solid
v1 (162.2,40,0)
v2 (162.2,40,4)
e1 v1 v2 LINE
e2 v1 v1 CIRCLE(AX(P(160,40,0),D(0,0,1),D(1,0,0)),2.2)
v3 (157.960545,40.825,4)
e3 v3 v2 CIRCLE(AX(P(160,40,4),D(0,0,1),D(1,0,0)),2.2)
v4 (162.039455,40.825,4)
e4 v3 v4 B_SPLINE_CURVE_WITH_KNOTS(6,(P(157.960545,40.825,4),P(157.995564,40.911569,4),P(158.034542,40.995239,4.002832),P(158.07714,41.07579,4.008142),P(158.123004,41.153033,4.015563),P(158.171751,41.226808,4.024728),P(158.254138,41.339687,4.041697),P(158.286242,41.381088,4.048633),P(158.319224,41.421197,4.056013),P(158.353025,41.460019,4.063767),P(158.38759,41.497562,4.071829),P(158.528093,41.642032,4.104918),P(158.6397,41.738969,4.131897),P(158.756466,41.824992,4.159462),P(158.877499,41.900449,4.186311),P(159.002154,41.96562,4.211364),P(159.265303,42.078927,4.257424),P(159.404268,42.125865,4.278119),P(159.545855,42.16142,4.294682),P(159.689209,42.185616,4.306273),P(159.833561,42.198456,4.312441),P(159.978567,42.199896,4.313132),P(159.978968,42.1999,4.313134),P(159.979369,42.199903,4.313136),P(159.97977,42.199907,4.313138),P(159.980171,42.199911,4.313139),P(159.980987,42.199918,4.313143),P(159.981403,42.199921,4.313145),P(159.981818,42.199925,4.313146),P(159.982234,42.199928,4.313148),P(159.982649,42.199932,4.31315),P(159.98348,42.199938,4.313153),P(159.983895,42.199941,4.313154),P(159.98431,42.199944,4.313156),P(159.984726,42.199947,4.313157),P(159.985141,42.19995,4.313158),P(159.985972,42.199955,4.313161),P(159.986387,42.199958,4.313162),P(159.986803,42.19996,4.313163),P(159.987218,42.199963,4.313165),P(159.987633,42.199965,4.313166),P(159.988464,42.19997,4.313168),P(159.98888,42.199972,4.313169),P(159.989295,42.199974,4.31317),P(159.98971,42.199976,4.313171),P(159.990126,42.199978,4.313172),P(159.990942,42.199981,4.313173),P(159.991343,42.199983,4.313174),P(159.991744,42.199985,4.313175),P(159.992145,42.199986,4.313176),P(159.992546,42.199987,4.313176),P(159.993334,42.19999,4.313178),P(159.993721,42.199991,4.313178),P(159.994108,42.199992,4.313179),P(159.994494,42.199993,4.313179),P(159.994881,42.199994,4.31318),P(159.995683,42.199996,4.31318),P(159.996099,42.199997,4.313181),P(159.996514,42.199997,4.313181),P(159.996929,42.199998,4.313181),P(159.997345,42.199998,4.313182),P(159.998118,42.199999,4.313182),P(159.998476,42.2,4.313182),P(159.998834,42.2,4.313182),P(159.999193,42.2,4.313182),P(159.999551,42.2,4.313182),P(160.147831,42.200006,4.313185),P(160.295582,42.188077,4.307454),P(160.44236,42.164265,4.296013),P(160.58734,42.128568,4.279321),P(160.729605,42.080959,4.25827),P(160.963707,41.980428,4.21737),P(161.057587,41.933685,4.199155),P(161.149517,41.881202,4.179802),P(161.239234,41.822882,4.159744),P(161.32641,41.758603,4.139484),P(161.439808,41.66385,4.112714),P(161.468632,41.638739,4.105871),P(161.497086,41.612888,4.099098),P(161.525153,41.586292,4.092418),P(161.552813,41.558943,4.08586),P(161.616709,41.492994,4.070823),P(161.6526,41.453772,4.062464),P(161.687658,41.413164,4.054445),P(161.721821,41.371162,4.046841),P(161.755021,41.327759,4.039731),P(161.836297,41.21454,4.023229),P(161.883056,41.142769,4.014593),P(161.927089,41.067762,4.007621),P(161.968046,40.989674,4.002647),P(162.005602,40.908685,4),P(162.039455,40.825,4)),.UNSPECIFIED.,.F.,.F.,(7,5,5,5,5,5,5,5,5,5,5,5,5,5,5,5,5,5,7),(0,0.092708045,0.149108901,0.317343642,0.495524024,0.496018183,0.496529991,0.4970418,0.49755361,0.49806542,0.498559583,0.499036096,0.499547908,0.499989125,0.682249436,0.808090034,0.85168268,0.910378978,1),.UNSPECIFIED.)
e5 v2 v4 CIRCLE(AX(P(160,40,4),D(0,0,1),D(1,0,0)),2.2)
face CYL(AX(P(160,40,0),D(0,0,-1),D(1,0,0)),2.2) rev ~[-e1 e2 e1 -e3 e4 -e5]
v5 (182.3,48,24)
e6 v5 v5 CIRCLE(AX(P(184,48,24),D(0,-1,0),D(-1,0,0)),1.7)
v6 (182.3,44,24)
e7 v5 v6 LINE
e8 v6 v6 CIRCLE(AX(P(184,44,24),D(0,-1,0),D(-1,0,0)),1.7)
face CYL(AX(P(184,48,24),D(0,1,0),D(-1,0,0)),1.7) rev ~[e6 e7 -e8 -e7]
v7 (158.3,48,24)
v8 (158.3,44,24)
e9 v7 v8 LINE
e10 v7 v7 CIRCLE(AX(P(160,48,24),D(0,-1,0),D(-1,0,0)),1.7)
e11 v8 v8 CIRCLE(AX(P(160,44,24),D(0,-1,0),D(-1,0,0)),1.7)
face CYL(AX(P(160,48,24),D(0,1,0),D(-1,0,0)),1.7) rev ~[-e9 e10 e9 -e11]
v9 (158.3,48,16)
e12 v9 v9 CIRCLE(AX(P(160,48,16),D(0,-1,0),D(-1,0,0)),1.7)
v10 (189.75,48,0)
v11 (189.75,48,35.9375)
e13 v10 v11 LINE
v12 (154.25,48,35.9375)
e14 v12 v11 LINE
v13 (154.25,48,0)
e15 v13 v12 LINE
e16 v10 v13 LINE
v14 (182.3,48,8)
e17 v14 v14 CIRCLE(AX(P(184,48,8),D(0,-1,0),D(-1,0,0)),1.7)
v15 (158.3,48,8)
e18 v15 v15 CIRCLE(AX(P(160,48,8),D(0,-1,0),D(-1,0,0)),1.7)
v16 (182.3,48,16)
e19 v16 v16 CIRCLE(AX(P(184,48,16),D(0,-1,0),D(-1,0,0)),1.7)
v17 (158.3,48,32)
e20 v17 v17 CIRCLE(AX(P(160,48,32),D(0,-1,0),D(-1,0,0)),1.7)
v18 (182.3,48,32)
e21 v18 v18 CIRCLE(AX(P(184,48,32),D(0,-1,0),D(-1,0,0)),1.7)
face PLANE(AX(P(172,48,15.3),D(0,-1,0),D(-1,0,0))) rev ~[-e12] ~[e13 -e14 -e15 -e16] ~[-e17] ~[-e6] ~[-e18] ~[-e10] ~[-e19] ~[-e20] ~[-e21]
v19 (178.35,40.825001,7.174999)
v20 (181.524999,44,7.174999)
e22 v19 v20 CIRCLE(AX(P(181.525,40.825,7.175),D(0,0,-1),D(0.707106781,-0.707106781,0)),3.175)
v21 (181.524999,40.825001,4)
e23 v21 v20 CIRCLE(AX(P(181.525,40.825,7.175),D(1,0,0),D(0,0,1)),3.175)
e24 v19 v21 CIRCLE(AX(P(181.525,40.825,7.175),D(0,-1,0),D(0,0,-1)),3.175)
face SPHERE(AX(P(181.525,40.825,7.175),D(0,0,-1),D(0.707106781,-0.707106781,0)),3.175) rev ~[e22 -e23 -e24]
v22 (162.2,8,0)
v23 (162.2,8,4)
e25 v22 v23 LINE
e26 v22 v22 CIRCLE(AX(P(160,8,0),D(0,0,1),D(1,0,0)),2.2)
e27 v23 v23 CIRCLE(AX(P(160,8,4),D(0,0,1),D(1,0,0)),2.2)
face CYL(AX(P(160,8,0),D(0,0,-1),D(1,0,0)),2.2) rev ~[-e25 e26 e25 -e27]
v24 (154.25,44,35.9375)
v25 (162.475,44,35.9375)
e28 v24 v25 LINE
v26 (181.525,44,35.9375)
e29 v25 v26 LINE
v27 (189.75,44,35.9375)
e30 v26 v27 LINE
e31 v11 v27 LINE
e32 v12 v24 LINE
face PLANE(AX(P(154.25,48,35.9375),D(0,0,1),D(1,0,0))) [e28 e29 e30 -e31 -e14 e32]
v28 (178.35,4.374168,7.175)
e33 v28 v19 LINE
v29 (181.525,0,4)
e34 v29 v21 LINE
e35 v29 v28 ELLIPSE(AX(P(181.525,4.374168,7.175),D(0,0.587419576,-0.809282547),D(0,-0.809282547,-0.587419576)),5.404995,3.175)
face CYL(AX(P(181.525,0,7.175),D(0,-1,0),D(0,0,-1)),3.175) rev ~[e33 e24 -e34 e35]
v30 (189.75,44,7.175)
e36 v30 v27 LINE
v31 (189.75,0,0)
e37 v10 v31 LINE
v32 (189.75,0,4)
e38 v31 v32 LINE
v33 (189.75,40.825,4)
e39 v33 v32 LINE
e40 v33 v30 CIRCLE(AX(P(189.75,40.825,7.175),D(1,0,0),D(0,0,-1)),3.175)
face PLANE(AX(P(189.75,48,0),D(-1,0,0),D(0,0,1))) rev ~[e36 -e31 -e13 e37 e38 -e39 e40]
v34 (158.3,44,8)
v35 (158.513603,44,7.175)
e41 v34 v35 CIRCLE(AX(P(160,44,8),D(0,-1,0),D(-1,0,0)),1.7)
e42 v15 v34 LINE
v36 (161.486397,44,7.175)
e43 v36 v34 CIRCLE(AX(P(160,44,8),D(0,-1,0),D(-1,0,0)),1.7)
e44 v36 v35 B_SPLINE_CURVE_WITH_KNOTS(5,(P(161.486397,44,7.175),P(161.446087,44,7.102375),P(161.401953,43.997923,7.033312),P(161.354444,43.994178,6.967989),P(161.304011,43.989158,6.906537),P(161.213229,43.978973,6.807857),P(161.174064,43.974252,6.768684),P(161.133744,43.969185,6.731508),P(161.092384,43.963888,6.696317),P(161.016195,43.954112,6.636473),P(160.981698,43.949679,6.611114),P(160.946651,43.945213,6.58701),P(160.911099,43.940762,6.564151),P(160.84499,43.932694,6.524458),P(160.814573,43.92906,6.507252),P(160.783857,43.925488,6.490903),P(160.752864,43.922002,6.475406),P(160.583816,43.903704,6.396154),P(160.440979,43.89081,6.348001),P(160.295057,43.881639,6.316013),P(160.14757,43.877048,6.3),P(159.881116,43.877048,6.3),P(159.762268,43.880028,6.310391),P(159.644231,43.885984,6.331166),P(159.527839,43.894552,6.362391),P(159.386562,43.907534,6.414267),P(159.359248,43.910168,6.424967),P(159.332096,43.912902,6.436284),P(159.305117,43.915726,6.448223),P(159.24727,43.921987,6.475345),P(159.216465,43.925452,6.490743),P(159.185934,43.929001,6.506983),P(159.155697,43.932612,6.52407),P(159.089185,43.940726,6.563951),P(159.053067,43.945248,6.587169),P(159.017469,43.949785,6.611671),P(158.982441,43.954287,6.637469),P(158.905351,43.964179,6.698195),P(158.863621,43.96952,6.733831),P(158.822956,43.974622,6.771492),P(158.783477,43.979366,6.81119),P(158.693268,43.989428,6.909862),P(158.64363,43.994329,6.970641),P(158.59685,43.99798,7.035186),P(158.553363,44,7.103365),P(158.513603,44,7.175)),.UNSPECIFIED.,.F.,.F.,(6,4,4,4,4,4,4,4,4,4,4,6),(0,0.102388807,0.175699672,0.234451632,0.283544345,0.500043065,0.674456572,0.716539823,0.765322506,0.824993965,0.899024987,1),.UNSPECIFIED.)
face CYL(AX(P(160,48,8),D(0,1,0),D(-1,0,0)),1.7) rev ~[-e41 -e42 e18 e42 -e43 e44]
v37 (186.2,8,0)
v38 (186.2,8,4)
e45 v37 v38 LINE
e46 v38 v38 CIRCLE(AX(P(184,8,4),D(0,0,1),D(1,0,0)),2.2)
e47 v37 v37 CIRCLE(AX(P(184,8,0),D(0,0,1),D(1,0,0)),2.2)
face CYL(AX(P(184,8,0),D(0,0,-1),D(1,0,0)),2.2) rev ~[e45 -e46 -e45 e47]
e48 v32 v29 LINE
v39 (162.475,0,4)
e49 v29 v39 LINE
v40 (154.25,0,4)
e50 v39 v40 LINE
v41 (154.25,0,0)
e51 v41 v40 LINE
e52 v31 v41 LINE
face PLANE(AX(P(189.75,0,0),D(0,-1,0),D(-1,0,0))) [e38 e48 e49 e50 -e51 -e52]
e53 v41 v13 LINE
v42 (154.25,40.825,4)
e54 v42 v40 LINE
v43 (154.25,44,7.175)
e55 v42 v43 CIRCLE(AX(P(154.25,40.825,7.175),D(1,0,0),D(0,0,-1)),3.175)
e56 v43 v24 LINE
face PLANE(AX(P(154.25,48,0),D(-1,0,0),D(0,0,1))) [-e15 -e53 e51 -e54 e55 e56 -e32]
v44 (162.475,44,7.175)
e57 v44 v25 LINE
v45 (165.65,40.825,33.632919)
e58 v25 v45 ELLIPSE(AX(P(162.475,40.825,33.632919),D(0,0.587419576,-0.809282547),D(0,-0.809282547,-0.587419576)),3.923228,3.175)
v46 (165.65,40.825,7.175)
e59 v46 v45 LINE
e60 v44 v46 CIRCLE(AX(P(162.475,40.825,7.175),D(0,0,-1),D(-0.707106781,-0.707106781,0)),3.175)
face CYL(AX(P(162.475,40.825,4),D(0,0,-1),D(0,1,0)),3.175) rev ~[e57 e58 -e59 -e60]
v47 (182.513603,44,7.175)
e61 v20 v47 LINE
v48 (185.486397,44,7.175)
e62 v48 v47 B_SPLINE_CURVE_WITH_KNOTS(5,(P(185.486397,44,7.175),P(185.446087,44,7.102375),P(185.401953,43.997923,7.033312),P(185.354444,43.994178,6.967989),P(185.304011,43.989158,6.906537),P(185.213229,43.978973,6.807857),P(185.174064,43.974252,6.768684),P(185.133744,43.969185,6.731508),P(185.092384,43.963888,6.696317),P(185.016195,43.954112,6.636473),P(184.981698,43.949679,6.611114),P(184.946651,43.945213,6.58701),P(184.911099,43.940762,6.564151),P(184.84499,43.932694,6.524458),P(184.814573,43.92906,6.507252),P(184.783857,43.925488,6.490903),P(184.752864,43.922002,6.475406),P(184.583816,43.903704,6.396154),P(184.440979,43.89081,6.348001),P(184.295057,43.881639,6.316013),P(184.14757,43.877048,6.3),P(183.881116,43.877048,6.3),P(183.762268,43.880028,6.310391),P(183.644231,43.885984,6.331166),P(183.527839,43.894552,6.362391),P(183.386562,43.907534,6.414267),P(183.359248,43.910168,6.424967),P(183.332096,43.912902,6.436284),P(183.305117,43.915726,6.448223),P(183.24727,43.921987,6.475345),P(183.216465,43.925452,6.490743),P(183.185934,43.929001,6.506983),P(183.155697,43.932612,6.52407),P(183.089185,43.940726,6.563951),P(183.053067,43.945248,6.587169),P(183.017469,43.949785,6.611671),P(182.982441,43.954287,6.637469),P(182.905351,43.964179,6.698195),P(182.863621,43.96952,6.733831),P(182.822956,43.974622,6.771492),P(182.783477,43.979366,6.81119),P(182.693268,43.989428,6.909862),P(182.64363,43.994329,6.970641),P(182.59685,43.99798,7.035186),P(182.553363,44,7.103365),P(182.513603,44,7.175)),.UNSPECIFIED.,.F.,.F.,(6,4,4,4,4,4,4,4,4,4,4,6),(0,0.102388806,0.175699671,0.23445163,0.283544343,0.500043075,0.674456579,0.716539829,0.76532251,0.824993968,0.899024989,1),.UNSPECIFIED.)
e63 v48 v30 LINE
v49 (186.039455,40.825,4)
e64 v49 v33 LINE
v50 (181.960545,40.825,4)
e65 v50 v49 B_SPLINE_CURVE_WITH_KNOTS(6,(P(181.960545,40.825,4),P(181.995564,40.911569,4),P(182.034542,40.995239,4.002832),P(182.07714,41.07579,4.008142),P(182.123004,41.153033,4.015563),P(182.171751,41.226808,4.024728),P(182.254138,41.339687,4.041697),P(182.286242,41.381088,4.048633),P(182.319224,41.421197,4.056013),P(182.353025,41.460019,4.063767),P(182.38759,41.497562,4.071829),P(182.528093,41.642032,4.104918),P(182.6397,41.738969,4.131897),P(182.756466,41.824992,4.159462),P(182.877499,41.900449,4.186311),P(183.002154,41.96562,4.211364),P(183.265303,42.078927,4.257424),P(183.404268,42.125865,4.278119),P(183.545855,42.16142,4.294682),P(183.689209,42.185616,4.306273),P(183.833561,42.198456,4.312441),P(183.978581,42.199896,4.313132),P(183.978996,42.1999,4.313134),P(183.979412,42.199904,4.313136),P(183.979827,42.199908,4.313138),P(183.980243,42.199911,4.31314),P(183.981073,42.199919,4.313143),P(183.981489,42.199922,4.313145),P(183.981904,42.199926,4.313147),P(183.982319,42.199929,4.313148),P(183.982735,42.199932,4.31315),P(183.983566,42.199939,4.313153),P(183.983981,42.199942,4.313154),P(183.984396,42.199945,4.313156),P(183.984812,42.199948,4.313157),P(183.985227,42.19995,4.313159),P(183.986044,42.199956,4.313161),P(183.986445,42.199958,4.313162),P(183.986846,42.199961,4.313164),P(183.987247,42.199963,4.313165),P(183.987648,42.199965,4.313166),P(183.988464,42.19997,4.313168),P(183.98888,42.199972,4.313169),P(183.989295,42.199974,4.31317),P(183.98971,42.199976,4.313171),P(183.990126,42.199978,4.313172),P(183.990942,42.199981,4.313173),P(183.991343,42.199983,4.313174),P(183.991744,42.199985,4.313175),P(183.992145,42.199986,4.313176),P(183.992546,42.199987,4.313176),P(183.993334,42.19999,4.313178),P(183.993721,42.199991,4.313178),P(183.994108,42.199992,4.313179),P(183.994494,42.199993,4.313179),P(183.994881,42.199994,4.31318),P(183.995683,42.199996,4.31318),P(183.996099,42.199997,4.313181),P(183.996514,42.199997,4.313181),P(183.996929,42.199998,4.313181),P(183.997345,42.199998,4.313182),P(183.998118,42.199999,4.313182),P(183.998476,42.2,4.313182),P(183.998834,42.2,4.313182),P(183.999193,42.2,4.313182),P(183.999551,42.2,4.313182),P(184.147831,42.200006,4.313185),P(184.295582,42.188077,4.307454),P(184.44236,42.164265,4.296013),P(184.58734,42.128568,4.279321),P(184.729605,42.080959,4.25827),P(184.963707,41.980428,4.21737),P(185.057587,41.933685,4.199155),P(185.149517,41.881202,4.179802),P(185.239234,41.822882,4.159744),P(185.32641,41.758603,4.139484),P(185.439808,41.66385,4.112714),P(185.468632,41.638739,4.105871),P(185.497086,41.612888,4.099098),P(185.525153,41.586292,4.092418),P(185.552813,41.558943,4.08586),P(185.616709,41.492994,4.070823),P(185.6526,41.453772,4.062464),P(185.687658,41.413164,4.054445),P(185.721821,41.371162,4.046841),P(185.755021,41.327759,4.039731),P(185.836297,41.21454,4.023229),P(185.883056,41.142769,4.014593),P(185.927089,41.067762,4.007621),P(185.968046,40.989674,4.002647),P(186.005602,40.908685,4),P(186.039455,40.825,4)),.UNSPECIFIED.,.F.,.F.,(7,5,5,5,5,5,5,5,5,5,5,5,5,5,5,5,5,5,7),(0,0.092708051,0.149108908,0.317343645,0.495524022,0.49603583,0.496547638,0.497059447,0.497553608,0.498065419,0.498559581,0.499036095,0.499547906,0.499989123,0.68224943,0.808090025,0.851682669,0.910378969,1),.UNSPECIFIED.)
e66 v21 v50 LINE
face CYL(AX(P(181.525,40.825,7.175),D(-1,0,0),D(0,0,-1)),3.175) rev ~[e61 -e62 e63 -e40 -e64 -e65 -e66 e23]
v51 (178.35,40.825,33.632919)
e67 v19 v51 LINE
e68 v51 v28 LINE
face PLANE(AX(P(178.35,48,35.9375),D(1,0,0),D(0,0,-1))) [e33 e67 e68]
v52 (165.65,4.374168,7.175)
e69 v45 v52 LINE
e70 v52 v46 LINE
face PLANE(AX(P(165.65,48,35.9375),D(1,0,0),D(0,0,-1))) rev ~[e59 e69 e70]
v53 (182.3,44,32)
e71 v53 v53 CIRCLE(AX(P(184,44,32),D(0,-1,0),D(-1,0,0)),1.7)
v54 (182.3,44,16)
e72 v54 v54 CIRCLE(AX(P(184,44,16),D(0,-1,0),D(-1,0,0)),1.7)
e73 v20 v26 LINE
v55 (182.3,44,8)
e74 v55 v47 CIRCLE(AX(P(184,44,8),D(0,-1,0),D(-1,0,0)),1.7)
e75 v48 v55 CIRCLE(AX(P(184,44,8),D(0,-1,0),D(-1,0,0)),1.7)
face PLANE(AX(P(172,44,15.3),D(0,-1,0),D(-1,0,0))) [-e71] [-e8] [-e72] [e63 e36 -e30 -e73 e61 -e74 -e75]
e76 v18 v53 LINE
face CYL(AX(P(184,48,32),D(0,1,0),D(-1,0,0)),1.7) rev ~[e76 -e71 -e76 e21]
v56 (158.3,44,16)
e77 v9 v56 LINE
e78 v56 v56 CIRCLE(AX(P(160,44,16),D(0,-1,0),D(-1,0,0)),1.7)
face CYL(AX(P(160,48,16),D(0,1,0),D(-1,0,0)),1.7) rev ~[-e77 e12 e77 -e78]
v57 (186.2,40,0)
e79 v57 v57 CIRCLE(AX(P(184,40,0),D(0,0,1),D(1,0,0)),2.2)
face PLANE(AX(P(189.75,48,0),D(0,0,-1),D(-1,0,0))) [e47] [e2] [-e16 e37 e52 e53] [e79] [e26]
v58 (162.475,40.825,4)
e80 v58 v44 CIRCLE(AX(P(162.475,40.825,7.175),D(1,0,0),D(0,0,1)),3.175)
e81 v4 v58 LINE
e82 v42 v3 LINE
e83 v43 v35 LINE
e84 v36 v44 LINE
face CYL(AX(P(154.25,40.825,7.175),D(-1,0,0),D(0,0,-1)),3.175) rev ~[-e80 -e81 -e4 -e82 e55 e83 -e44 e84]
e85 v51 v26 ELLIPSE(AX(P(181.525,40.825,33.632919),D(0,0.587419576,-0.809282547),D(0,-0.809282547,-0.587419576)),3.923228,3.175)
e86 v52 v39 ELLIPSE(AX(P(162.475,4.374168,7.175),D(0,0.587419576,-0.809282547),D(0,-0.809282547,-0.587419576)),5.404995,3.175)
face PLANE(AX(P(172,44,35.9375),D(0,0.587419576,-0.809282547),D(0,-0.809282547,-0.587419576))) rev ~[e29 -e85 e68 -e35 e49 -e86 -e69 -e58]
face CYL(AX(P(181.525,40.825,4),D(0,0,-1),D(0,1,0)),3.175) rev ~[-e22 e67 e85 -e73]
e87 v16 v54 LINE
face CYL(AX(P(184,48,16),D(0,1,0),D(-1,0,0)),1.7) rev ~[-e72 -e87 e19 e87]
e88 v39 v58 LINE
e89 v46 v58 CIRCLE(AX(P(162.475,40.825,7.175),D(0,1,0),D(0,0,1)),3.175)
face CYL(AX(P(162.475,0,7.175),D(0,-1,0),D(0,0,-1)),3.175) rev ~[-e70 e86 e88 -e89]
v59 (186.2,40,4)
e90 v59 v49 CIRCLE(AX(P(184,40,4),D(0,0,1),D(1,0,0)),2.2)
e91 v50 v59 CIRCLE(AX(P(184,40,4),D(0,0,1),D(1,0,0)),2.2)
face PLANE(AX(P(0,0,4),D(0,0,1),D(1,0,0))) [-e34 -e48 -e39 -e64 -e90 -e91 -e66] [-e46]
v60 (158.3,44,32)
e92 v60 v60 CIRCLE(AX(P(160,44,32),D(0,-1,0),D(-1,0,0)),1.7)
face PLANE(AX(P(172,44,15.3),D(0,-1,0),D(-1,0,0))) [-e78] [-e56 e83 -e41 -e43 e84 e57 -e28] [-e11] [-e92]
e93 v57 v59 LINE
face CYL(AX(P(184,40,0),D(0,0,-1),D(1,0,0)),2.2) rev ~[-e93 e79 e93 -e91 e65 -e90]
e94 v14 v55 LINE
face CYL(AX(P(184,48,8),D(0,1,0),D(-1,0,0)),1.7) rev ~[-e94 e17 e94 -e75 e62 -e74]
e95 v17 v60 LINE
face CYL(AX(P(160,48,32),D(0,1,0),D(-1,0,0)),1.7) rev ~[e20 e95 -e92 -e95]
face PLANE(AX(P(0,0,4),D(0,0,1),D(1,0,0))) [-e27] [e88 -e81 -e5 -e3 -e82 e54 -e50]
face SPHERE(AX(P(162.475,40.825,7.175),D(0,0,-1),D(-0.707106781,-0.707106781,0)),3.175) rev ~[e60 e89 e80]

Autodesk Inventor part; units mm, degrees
ref_plane "Work Plane1" through (172, 48, 15.3) normal (0, -1, 0) x (-1, 0, 0)
sketch "Sketch1" plane through (172, 48, 15.3) normal (0, -1, 0) x (-1, 0, 0)
  circle A0 centre (12, -16.7) radius 1.7 construction
  circle A1 centre (12, -32.7) radius 1.7 construction
  circle A2 centre (-12, 7.3) radius 1.7 construction
  circle A3 centre (-12, 15.3) radius 1.7 construction
  circle A4 centre (-12, 23.3) radius 1.7 construction
  circle A5 centre (-12, -24.7) radius 1.7 construction
  circle A6 centre (12, 23.3) radius 1.7 construction
  circle A7 centre (12, -56.7) radius 1.7 construction
  circle A8 centre (12, -48.7) radius 1.7 construction
  circle A9 centre (12, -40.7) radius 1.7 construction
  circle A10 centre (12, -8.7) radius 1.7 construction
  circle A11 centre (-12, -16.7) radius 1.7 construction
  circle A12 centre (12, -24.7) radius 1.7 construction
  circle A13 centre (-12, -0.7) radius 1.7 construction
  circle A14 centre (-12, -40.7) radius 1.7 construction
  circle A15 centre (-12, -48.7) radius 1.7 construction
  circle A16 centre (-12, -56.7) radius 1.7 construction
  circle A17 centre (-12, -32.7) radius 1.7 construction
  circle A18 centre (12, -80.7) radius 1.7 construction
  circle A19 centre (12, 15.3) radius 1.7 construction
  circle A20 centre (12, 7.3) radius 1.7 construction
  circle A21 centre (12, -0.7) radius 1.7 construction
  circle A22 centre (-12, -8.7) radius 1.7 construction
  circle A23 centre (-12, -80.7) radius 1.7 construction
  line L0 (10.05, 51.5627) -> (14.45, 51.5627) construction
  line L1 (14.45, 51.5627) -> (14.45, 45.5871) construction
  line L2 (14.45, 45.5871) -> (10.05, 45.5871) construction
  line L3 (10.05, 45.5871) -> (10.05, 51.5627) construction
  line L4 (10.05, -66.0122) -> (14.45, -66.0122) construction
  line L5 (14.45, -66.0122) -> (14.45, -71.9878) construction
  line L6 (14.45, -71.9878) -> (10.05, -71.9878) construction
  line L7 (10.05, -71.9878) -> (10.05, -66.0122) construction
  line L8 (-10.05, 75.3622) -> (-14.45, 75.3622) construction
  line L9 (-14.45, 75.3622) -> (-14.45, 81.3378) construction
  line L10 (-14.45, 81.3378) -> (-10.05, 81.3378) construction
  line L11 (-10.05, 81.3378) -> (-10.05, 75.3622) construction
  line L12 (-14.45, 56.302) -> (-10.05, 56.302) construction
  line L13 (-10.05, 56.302) -> (-10.05, 50.3264) construction
  line L14 (-10.05, 50.3264) -> (-14.45, 50.3264) construction
  line L15 (-14.45, 50.3264) -> (-14.45, 56.302) construction
  line L16 (9.5604, 33.925) -> (12.375, 35.55) construction
  line L17 (12.375, 35.55) -> (15.1896, 33.925) construction
  line L18 (15.1896, 33.925) -> (15.1896, 30.675) construction
  line L19 (15.1896, 30.675) -> (12.375, 29.05) construction
  line L20 (12.375, 29.05) -> (9.5604, 30.675) construction
  line L21 (9.5604, 30.675) -> (9.5604, 33.925) construction
  line L22 (2.8106, 33.925) -> (5.6252, 35.55) construction
  line L23 (5.6252, 35.55) -> (8.4398, 33.925) construction
  line L24 (8.4398, 33.925) -> (8.4398, 30.675) construction
  line L25 (8.4398, 30.675) -> (5.6252, 29.05) construction
  line L26 (5.6252, 29.05) -> (2.8106, 30.675) construction
  line L27 (2.8106, 30.675) -> (2.8106, 33.925) construction
  line L28 (3.2502, 68.3) -> (3.2502, 81) construction
  line L29 (3.2502, 81) -> (8.0002, 81) construction
  line L30 (8.0002, 81) -> (8.0002, 68.3) construction
  line L31 (8.0002, 68.3) -> (3.2502, 68.3) construction
  circle A24 centre (12.375, 40.3) radius 1.7 construction
  circle A25 centre (5.6252, 40.3) radius 1.7 construction
  line L32 (10.0002, 81) -> (14.75, 81) construction
  line L33 (14.75, 81) -> (14.75, 68.3) construction
  line L34 (14.75, 68.3) -> (10.0002, 68.3) construction
  line L35 (10.0002, 68.3) -> (10.0002, 81) construction
  line L36 (3.2502, 53.6) -> (3.2502, 66.3) construction
  line L37 (3.2502, 66.3) -> (8.0002, 66.3) construction
  line L38 (8.0002, 66.3) -> (8.0002, 53.6) construction
  line L39 (8.0002, 53.6) -> (3.2502, 53.6) construction
  circle A26 centre (-7.75, 60) radius 1.7 construction
  circle A27 centre (-7.75, -75) radius 1.7 construction
  line L40 (-6.125, 72.8146) -> (-4.5, 70) construction
  line L41 (-4.5, 70) -> (-6.125, 67.1854) construction
  line L42 (-6.125, 67.1854) -> (-9.375, 67.1854) construction
  line L43 (-9.375, 67.1854) -> (-11, 70) construction
  line L44 (-11, 70) -> (-9.375, 72.8146) construction
  line L45 (-9.375, 72.8146) -> (-6.125, 72.8146) construction
  line L46 (-6.125, -62.1854) -> (-4.5, -65) construction
  line L47 (-4.5, -65) -> (-6.125, -67.8146) construction
  line L48 (-6.125, -67.8146) -> (-9.375, -67.8146) construction
  line L49 (-9.375, -67.8146) -> (-11, -65) construction
  line L50 (-11, -65) -> (-9.375, -62.1854) construction
  line L51 (-9.375, -62.1854) -> (-6.125, -62.1854) construction
  line L52 (17.75, 85) -> (-17.75, 85) construction
  line L53 (-17.75, 85) -> (-17.75, -85) construction
  line L54 (-17.75, -85) -> (17.75, -85) construction
  line L55 (17.75, -85) -> (17.75, 85) construction
  line L56 (172, 15.3) -> (-20, 15.3) construction
  line L57 (-17.75, 15.3) -> (17.75, 15.3)
  line L58 (17.75, 15.3) -> (17.75, -20.6375)
  line L59 (17.75, -20.6375) -> (-17.75, -20.6375)
  line L60 (-17.75, 15.3) -> (-17.75, -20.6375)
  circle A28 centre (-12, 7.3) radius 1.7
  circle A29 centre (-12, -0.7) radius 1.7
  circle A30 centre (-12, -8.7) radius 1.7
  circle A31 centre (-12, -16.7) radius 1.7
  circle A32 centre (12, -16.7) radius 1.7
  circle A33 centre (12, -8.7) radius 1.7
  circle A34 centre (12, -0.7) radius 1.7
  circle A35 centre (12, 7.3) radius 1.7
extrude "Extrusion1" add sketch "Sketch1" along normal blind 4
ref_plane "Work Plane2" through (0, 0, 0) normal (0, 0, 1) x (1, 0, 0)
sketch "Sketch2" plane through (0, 0, 0) normal (0, 0, 1) x (1, 0, 0)
  line L0 (192, 0) -> (192, 48) construction
  line L1 (0, 48) -> (192, 48) construction
  line L2 (0, 0) -> (0, 48) construction
  line L3 (0, 0) -> (192, 0) construction
  circle A0 centre (168, 24) radius 7 construction
  circle A1 centre (144, 24) radius 7 construction
  arc A2 (160.9289, 33.8995) -> (158.1005, 31.0711) centre (159.5147, 32.4853) ccw construction
  line L4 (161.4142, 33.4142) -> (160.9289, 33.8995) construction
  arc A3 (158.5858, 30.5858) -> (161.4142, 33.4142) centre (160, 32) ccw construction
  line L5 (158.1005, 31.0711) -> (158.5858, 30.5858) construction
  line L6 (156.6863, 26) -> (155.3137, 26) construction
  arc A4 (156.6863, 22) -> (156.6863, 26) centre (156.6863, 24) ccw construction
  line L7 (155.3137, 22) -> (156.6863, 22) construction
  arc A5 (155.3137, 26) -> (155.3137, 22) centre (155.3137, 24) ccw construction
  arc A6 (158.1005, 16.9289) -> (160.9289, 14.1005) centre (159.5147, 15.5147) ccw construction
  line L8 (158.5858, 17.4142) -> (158.1005, 16.9289) construction
  arc A7 (161.4142, 14.5858) -> (158.5858, 17.4142) centre (160, 16) ccw construction
  line L9 (160.9289, 14.1005) -> (161.4142, 14.5858) construction
  arc A8 (177.8995, 31.0711) -> (175.0711, 33.8995) centre (176.4853, 32.4853) ccw construction
  line L10 (177.4142, 30.5858) -> (177.8995, 31.0711) construction
  arc A9 (174.5858, 33.4142) -> (177.4142, 30.5858) centre (176, 32) ccw construction
  line L11 (175.0711, 33.8995) -> (174.5858, 33.4142) construction
  arc A10 (180.6863, 22) -> (180.6863, 26) centre (180.6863, 24) ccw construction
  line L12 (179.3137, 22) -> (180.6863, 22) construction
  arc A11 (179.3137, 26) -> (179.3137, 22) centre (179.3137, 24) ccw construction
  line L13 (180.6863, 26) -> (179.3137, 26) construction
  line L14 (170, 35.3137) -> (170, 40) construction
  arc A12 (166, 35.3137) -> (170, 35.3137) centre (168, 35.3137) ccw construction
  line L15 (166, 40) -> (166, 35.3137) construction
  arc A13 (170, 40) -> (166, 40) centre (168, 40) ccw construction
  circle A14 centre (160, 40) radius 2 construction
  circle A15 centre (152, 40) radius 2 construction
  line L16 (146, 35.3137) -> (146, 40) construction
  arc A16 (142, 35.3137) -> (146, 35.3137) centre (144, 35.3137) ccw construction
  line L17 (142, 40) -> (142, 35.3137) construction
  arc A17 (146, 40) -> (142, 40) centre (144, 40) ccw construction
  circle A18 centre (136, 40) radius 2 construction
  circle A19 centre (128, 40) radius 2 construction
  line L18 (122, 35.3137) -> (122, 40) construction
  arc A20 (118, 35.3137) -> (122, 35.3137) centre (120, 35.3137) ccw construction
  line L19 (118, 40) -> (118, 35.3137) construction
  arc A21 (122, 40) -> (118, 40) centre (120, 40) ccw construction
  circle A22 centre (112, 40) radius 2 construction
  circle A23 centre (104, 40) radius 2 construction
  line L20 (98, 35.3137) -> (98, 40) construction
  arc A24 (94, 35.3137) -> (98, 35.3137) centre (96, 35.3137) ccw construction
  line L21 (94, 40) -> (94, 35.3137) construction
  arc A25 (98, 40) -> (94, 40) centre (96, 40) ccw construction
  circle A26 centre (88, 40) radius 2 construction
  circle A27 centre (80, 40) radius 2 construction
  line L22 (74, 35.3137) -> (74, 40) construction
  arc A28 (70, 35.3137) -> (74, 35.3137) centre (72, 35.3137) ccw construction
  line L23 (70, 40) -> (70, 35.3137) construction
  arc A29 (74, 40) -> (70, 40) centre (72, 40) ccw construction
  circle A30 centre (64, 40) radius 2 construction
  circle A31 centre (56, 40) radius 2 construction
  line L24 (50, 35.3137) -> (50, 40) construction
  arc A32 (46, 35.3137) -> (50, 35.3137) centre (48, 35.3137) ccw construction
  line L25 (46, 40) -> (46, 35.3137) construction
  arc A33 (50, 40) -> (46, 40) centre (48, 40) ccw construction
  circle A34 centre (40, 40) radius 2 construction
  circle A35 centre (32, 40) radius 2 construction
  line L26 (26, 35.3137) -> (26, 40) construction
  arc A36 (22, 35.3137) -> (26, 35.3137) centre (24, 35.3137) ccw construction
  line L27 (22, 40) -> (22, 35.3137) construction
  arc A37 (26, 40) -> (22, 40) centre (24, 40) ccw construction
  circle A38 centre (16, 40) radius 2 construction
  circle A39 centre (8, 40) radius 2 construction
  line L28 (166, 12.6863) -> (166, 8) construction
  arc A40 (170, 12.6863) -> (166, 12.6863) centre (168, 12.6863) ccw construction
  line L29 (170, 8) -> (170, 12.6863) construction
  arc A41 (166, 8) -> (170, 8) centre (168, 8) ccw construction
  circle A42 centre (160, 8) radius 2 construction
  circle A43 centre (152, 8) radius 2 construction
  line L30 (142, 12.6863) -> (142, 8) construction
  arc A44 (146, 12.6863) -> (142, 12.6863) centre (144, 12.6863) ccw construction
  line L31 (146, 8) -> (146, 12.6863) construction
  arc A45 (142, 8) -> (146, 8) centre (144, 8) ccw construction
  circle A46 centre (136, 8) radius 2 construction
  circle A47 centre (128, 8) radius 2 construction
  line L32 (118, 12.6863) -> (118, 8) construction
  arc A48 (122, 12.6863) -> (118, 12.6863) centre (120, 12.6863) ccw construction
  line L33 (122, 8) -> (122, 12.6863) construction
  arc A49 (118, 8) -> (122, 8) centre (120, 8) ccw construction
  circle A50 centre (112, 8) radius 2 construction
  circle A51 centre (104, 8) radius 2 construction
  line L34 (94, 12.6863) -> (94, 8) construction
  arc A52 (98, 12.6863) -> (94, 12.6863) centre (96, 12.6863) ccw construction
  line L35 (98, 8) -> (98, 12.6863) construction
  arc A53 (94, 8) -> (98, 8) centre (96, 8) ccw construction
  circle A54 centre (88, 8) radius 2 construction
  circle A55 centre (80, 8) radius 2 construction
  line L36 (70, 12.6863) -> (70, 8) construction
  arc A56 (74, 12.6863) -> (70, 12.6863) centre (72, 12.6863) ccw construction
  line L37 (74, 8) -> (74, 12.6863) construction
  arc A57 (70, 8) -> (74, 8) centre (72, 8) ccw construction
  circle A58 centre (64, 8) radius 2 construction
  circle A59 centre (56, 8) radius 2 construction
  line L38 (46, 12.6863) -> (46, 8) construction
  arc A60 (50, 12.6863) -> (46, 12.6863) centre (48, 12.6863) ccw construction
  line L39 (50, 8) -> (50, 12.6863) construction
  arc A61 (46, 8) -> (50, 8) centre (48, 8) ccw construction
  circle A62 centre (40, 8) radius 2 construction
  circle A63 centre (32, 8) radius 2 construction
  line L40 (22, 12.6863) -> (22, 8) construction
  arc A64 (26, 12.6863) -> (22, 12.6863) centre (24, 12.6863) ccw construction
  line L41 (26, 8) -> (26, 12.6863) construction
  arc A65 (22, 8) -> (26, 8) centre (24, 8) ccw construction
  circle A66 centre (16, 8) radius 2 construction
  circle A67 centre (8, 8) radius 2 construction
  arc A68 (9.8995, 31.0711) -> (7.0711, 33.8995) centre (8.4853, 32.4853) ccw construction
  line L42 (9.4142, 30.5858) -> (9.8995, 31.0711) construction
  arc A69 (6.5858, 33.4142) -> (9.4142, 30.5858) centre (8, 32) ccw construction
  line L43 (7.0711, 33.8995) -> (6.5858, 33.4142) construction
  arc A70 (7.0711, 14.1005) -> (9.8995, 16.9289) centre (8.4853, 15.5147) ccw construction
  line L44 (6.5858, 14.5858) -> (7.0711, 14.1005) construction
  arc A71 (9.4142, 17.4142) -> (6.5858, 14.5858) centre (8, 16) ccw construction
  line L45 (9.8995, 16.9289) -> (9.4142, 17.4142) construction
  arc A72 (184.9289, 33.8995) -> (182.1005, 31.0711) centre (183.5147, 32.4853) ccw construction
  line L46 (185.4142, 33.4142) -> (184.9289, 33.8995) construction
  arc A73 (182.5858, 30.5858) -> (185.4142, 33.4142) centre (184, 32) ccw construction
  line L47 (182.1005, 31.0711) -> (182.5858, 30.5858) construction
  arc A74 (182.1005, 16.9289) -> (184.9289, 14.1005) centre (183.5147, 15.5147) ccw construction
  line L48 (182.5858, 17.4142) -> (182.1005, 16.9289) construction
  arc A75 (185.4142, 14.5858) -> (182.5858, 17.4142) centre (184, 16) ccw construction
  line L49 (184.9289, 14.1005) -> (185.4142, 14.5858) construction
  circle A76 centre (176, 8) radius 2 construction
  circle A77 centre (176, 40) radius 2 construction
  circle A78 centre (184, 40) radius 2 construction
  circle A79 centre (184, 8) radius 2 construction
  arc A80 (33.8995, 31.0711) -> (31.0711, 33.8995) centre (32.4853, 32.4853) ccw construction
  line L50 (33.4142, 30.5858) -> (33.8995, 31.0711) construction
  arc A81 (30.5858, 33.4142) -> (33.4142, 30.5858) centre (32, 32) ccw construction
  line L51 (31.0711, 33.8995) -> (30.5858, 33.4142) construction
  arc A82 (57.8995, 31.0711) -> (55.0711, 33.8995) centre (56.4853, 32.4853) ccw construction
  line L52 (57.4142, 30.5858) -> (57.8995, 31.0711) construction
  arc A83 (54.5858, 33.4142) -> (57.4142, 30.5858) centre (56, 32) ccw construction
  line L53 (55.0711, 33.8995) -> (54.5858, 33.4142) construction
  arc A84 (81.8995, 31.0711) -> (79.0711, 33.8995) centre (80.4853, 32.4853) ccw construction
  line L54 (81.4142, 30.5858) -> (81.8995, 31.0711) construction
  arc A85 (78.5858, 33.4142) -> (81.4142, 30.5858) centre (80, 32) ccw construction
  line L55 (79.0711, 33.8995) -> (78.5858, 33.4142) construction
  arc A86 (105.8995, 31.0711) -> (103.0711, 33.8995) centre (104.4853, 32.4853) ccw construction
  line L56 (105.4142, 30.5858) -> (105.8995, 31.0711) construction
  arc A87 (102.5858, 33.4142) -> (105.4142, 30.5858) centre (104, 32) ccw construction
  line L57 (103.0711, 33.8995) -> (102.5858, 33.4142) construction
  arc A88 (129.8995, 31.0711) -> (127.0711, 33.8995) centre (128.4853, 32.4853) ccw construction
  line L58 (129.4142, 30.5858) -> (129.8995, 31.0711) construction
  arc A89 (126.5858, 33.4142) -> (129.4142, 30.5858) centre (128, 32) ccw construction
  line L59 (127.0711, 33.8995) -> (126.5858, 33.4142) construction
  arc A90 (153.8995, 31.0711) -> (151.0711, 33.8995) centre (152.4853, 32.4853) ccw construction
  line L60 (153.4142, 30.5858) -> (153.8995, 31.0711) construction
  arc A91 (150.5858, 33.4142) -> (153.4142, 30.5858) centre (152, 32) ccw construction
  line L61 (151.0711, 33.8995) -> (150.5858, 33.4142) construction
  arc A92 (14.1005, 16.9289) -> (16.9289, 14.1005) centre (15.5147, 15.5147) ccw construction
  line L62 (14.5858, 17.4142) -> (14.1005, 16.9289) construction
  arc A93 (17.4142, 14.5858) -> (14.5858, 17.4142) centre (16, 16) ccw construction
  line L63 (16.9289, 14.1005) -> (17.4142, 14.5858) construction
  arc A94 (38.1005, 16.9289) -> (40.9289, 14.1005) centre (39.5147, 15.5147) ccw construction
  line L64 (38.5858, 17.4142) -> (38.1005, 16.9289) construction
  arc A95 (41.4142, 14.5858) -> (38.5858, 17.4142) centre (40, 16) ccw construction
  line L65 (40.9289, 14.1005) -> (41.4142, 14.5858) construction
  arc A96 (62.1005, 16.9289) -> (64.9289, 14.1005) centre (63.5147, 15.5147) ccw construction
  line L66 (62.5858, 17.4142) -> (62.1005, 16.9289) construction
  arc A97 (65.4142, 14.5858) -> (62.5858, 17.4142) centre (64, 16) ccw construction
  line L67 (64.9289, 14.1005) -> (65.4142, 14.5858) construction
  arc A98 (86.1005, 16.9289) -> (88.9289, 14.1005) centre (87.5147, 15.5147) ccw construction
  line L68 (86.5858, 17.4142) -> (86.1005, 16.9289) construction
  arc A99 (89.4142, 14.5858) -> (86.5858, 17.4142) centre (88, 16) ccw construction
  line L69 (88.9289, 14.1005) -> (89.4142, 14.5858) construction
  arc A100 (110.1005, 16.9289) -> (112.9289, 14.1005) centre (111.5147, 15.5147) ccw construction
  line L70 (110.5858, 17.4142) -> (110.1005, 16.9289) construction
  arc A101 (113.4142, 14.5858) -> (110.5858, 17.4142) centre (112, 16) ccw construction
  line L71 (112.9289, 14.1005) -> (113.4142, 14.5858) construction
  arc A102 (134.1005, 16.9289) -> (136.9289, 14.1005) centre (135.5147, 15.5147) ccw construction
  line L72 (134.5858, 17.4142) -> (134.1005, 16.9289) construction
  arc A103 (137.4142, 14.5858) -> (134.5858, 17.4142) centre (136, 16) ccw construction
  line L73 (136.9289, 14.1005) -> (137.4142, 14.5858) construction
  line L74 (11.3137, 22) -> (12.6863, 22) construction
  arc A104 (11.3137, 26) -> (11.3137, 22) centre (11.3137, 24) ccw construction
  line L75 (12.6863, 26) -> (11.3137, 26) construction
  arc A105 (12.6863, 22) -> (12.6863, 26) centre (12.6863, 24) ccw construction
  line L76 (36.6863, 26) -> (35.3137, 26) construction
  arc A106 (36.6863, 22) -> (36.6863, 26) centre (36.6863, 24) ccw construction
  line L77 (35.3137, 22) -> (36.6863, 22) construction
  arc A107 (35.3137, 26) -> (35.3137, 22) centre (35.3137, 24) ccw construction
  line L78 (60.6863, 26) -> (59.3137, 26) construction
  arc A108 (60.6863, 22) -> (60.6863, 26) centre (60.6863, 24) ccw construction
  line L79 (59.3137, 22) -> (60.6863, 22) construction
  arc A109 (59.3137, 26) -> (59.3137, 22) centre (59.3137, 24) ccw construction
  line L80 (84.6863, 26) -> (83.3137, 26) construction
  arc A110 (84.6863, 22) -> (84.6863, 26) centre (84.6863, 24) ccw construction
  line L81 (83.3137, 22) -> (84.6863, 22) construction
  arc A111 (83.3137, 26) -> (83.3137, 22) centre (83.3137, 24) ccw construction
  line L82 (108.6863, 26) -> (107.3137, 26) construction
  arc A112 (108.6863, 22) -> (108.6863, 26) centre (108.6863, 24) ccw construction
  line L83 (107.3137, 22) -> (108.6863, 22) construction
  arc A113 (107.3137, 26) -> (107.3137, 22) centre (107.3137, 24) ccw construction
  line L84 (132.6863, 26) -> (131.3137, 26) construction
  arc A114 (132.6863, 22) -> (132.6863, 26) centre (132.6863, 24) ccw construction
  line L85 (131.3137, 22) -> (132.6863, 22) construction
  arc A115 (131.3137, 26) -> (131.3137, 22) centre (131.3137, 24) ccw construction
  arc A116 (16.9289, 33.8995) -> (14.1005, 31.0711) centre (15.5147, 32.4853) ccw construction
  line L86 (17.4142, 33.4142) -> (16.9289, 33.8995) construction
  arc A117 (14.5858, 30.5858) -> (17.4142, 33.4142) centre (16, 32) ccw construction
  line L87 (14.1005, 31.0711) -> (14.5858, 30.5858) construction
  arc A118 (40.9289, 33.8995) -> (38.1005, 31.0711) centre (39.5147, 32.4853) ccw construction
  line L88 (41.4142, 33.4142) -> (40.9289, 33.8995) construction
  arc A119 (38.5858, 30.5858) -> (41.4142, 33.4142) centre (40, 32) ccw construction
  line L89 (38.1005, 31.0711) -> (38.5858, 30.5858) construction
  arc A120 (64.9289, 33.8995) -> (62.1005, 31.0711) centre (63.5147, 32.4853) ccw construction
  line L90 (65.4142, 33.4142) -> (64.9289, 33.8995) construction
  arc A121 (62.5858, 30.5858) -> (65.4142, 33.4142) centre (64, 32) ccw construction
  line L91 (62.1005, 31.0711) -> (62.5858, 30.5858) construction
  arc A122 (88.9289, 33.8995) -> (86.1005, 31.0711) centre (87.5147, 32.4853) ccw construction
  line L92 (89.4142, 33.4142) -> (88.9289, 33.8995) construction
  arc A123 (86.5858, 30.5858) -> (89.4142, 33.4142) centre (88, 32) ccw construction
  line L93 (86.1005, 31.0711) -> (86.5858, 30.5858) construction
  arc A124 (112.9289, 33.8995) -> (110.1005, 31.0711) centre (111.5147, 32.4853) ccw construction
  line L94 (113.4142, 33.4142) -> (112.9289, 33.8995) construction
  arc A125 (110.5858, 30.5858) -> (113.4142, 33.4142) centre (112, 32) ccw construction
  line L95 (110.1005, 31.0711) -> (110.5858, 30.5858) construction
  arc A126 (136.9289, 33.8995) -> (134.1005, 31.0711) centre (135.5147, 32.4853) ccw construction
  line L96 (137.4142, 33.4142) -> (136.9289, 33.8995) construction
  arc A127 (134.5858, 30.5858) -> (137.4142, 33.4142) centre (136, 32) ccw construction
  line L97 (134.1005, 31.0711) -> (134.5858, 30.5858) construction
  arc A128 (31.0711, 14.1005) -> (33.8995, 16.9289) centre (32.4853, 15.5147) ccw construction
  line L98 (30.5858, 14.5858) -> (31.0711, 14.1005) construction
  arc A129 (33.4142, 17.4142) -> (30.5858, 14.5858) centre (32, 16) ccw construction
  line L99 (33.8995, 16.9289) -> (33.4142, 17.4142) construction
  arc A130 (55.0711, 14.1005) -> (57.8995, 16.9289) centre (56.4853, 15.5147) ccw construction
  line L100 (54.5858, 14.5858) -> (55.0711, 14.1005) construction
  arc A131 (57.4142, 17.4142) -> (54.5858, 14.5858) centre (56, 16) ccw construction
  line L101 (57.8995, 16.9289) -> (57.4142, 17.4142) construction
  arc A132 (79.0711, 14.1005) -> (81.8995, 16.9289) centre (80.4853, 15.5147) ccw construction
  line L102 (78.5858, 14.5858) -> (79.0711, 14.1005) construction
  arc A133 (81.4142, 17.4142) -> (78.5858, 14.5858) centre (80, 16) ccw construction
  line L103 (81.8995, 16.9289) -> (81.4142, 17.4142) construction
  arc A134 (103.0711, 14.1005) -> (105.8995, 16.9289) centre (104.4853, 15.5147) ccw construction
  line L104 (102.5858, 14.5858) -> (103.0711, 14.1005) construction
  arc A135 (105.4142, 17.4142) -> (102.5858, 14.5858) centre (104, 16) ccw construction
  line L105 (105.8995, 16.9289) -> (105.4142, 17.4142) construction
  arc A136 (127.0711, 14.1005) -> (129.8995, 16.9289) centre (128.4853, 15.5147) ccw construction
  line L106 (126.5858, 14.5858) -> (127.0711, 14.1005) construction
  arc A137 (129.4142, 17.4142) -> (126.5858, 14.5858) centre (128, 16) ccw construction
  line L107 (129.8995, 16.9289) -> (129.4142, 17.4142) construction
  arc A138 (151.0711, 14.1005) -> (153.8995, 16.9289) centre (152.4853, 15.5147) ccw construction
  line L108 (150.5858, 14.5858) -> (151.0711, 14.1005) construction
  arc A139 (153.4142, 17.4142) -> (150.5858, 14.5858) centre (152, 16) ccw construction
  line L109 (153.8995, 16.9289) -> (153.4142, 17.4142) construction
  arc A140 (175.0711, 14.1005) -> (177.8995, 16.9289) centre (176.4853, 15.5147) ccw construction
  line L110 (174.5858, 14.5858) -> (175.0711, 14.1005) construction
  arc A141 (177.4142, 17.4142) -> (174.5858, 14.5858) centre (176, 16) ccw construction
  line L111 (177.8995, 16.9289) -> (177.4142, 17.4142) construction
  circle A142 centre (24, 24) radius 7 construction
  circle A143 centre (48, 24) radius 7 construction
  circle A144 centre (72, 24) radius 7 construction
  circle A145 centre (96, 24) radius 7 construction
  circle A146 centre (120, 24) radius 7 construction
  circle A147 centre (184, 8) radius 2.2
  circle A148 centre (184, 40) radius 2.2
  circle A149 centre (160, 40) radius 2.2
  circle A150 centre (160, 8) radius 2.2
  line L112 (154.25, 44) -> (189.75, 44) projected
  line L113 (154.25, 44) -> (154.25, 0)
  line L114 (189.75, 0) -> (154.25, 0)
  line L115 (154.25, 44) -> (189.75, 44)
  line L116 (189.75, 48) -> (189.75, 44) projected
  line L117 (189.75, 44) -> (189.75, 0)
  point P0 (192, 44)
  dimension "d2" = 4.4
  dimension "d3" = 4.4
  dimension "d4" = 4.4
  dimension "d5" = 4.4
extrude "Extrusion2" add sketch "Sketch2" along normal blind 4
ref_plane "Work Plane3" through (172, 48, 35.9375) normal (1, 0, 0) x (0, 0, -1)
sketch "Sketch3" plane through (172, 48, 35.9375) normal (1, 0, 0) x (0, 0, -1)
  line L0 (31.9375, -48) -> (31.9375, -4) projected
  line L1 (31.9375, -4) -> (0, -4) projected
  line L2 (31.9375, -48) -> (31.9375, -4)
  line L3 (0, -4) -> (31.9375, -48)
  point P0 (35.9375, -48)
extrude "Extrusion3" add sketch "Sketch3" along normal mid plane 12.7
fillet "Fillet1" radius 3.175 4 edges at (178.35, 44, 19.9688) (178.35, 22, 4) (165.65, 22, 4) (165.65, 44, 19.9688)
fillet "Fillet2" radius 3.175 4 edges at (179.2799, 43.0701, 4.9299) (185.6375, 44, 4) (164.7201, 43.0701, 4.9299) (158.3625, 44, 4)
properties part number "support"
